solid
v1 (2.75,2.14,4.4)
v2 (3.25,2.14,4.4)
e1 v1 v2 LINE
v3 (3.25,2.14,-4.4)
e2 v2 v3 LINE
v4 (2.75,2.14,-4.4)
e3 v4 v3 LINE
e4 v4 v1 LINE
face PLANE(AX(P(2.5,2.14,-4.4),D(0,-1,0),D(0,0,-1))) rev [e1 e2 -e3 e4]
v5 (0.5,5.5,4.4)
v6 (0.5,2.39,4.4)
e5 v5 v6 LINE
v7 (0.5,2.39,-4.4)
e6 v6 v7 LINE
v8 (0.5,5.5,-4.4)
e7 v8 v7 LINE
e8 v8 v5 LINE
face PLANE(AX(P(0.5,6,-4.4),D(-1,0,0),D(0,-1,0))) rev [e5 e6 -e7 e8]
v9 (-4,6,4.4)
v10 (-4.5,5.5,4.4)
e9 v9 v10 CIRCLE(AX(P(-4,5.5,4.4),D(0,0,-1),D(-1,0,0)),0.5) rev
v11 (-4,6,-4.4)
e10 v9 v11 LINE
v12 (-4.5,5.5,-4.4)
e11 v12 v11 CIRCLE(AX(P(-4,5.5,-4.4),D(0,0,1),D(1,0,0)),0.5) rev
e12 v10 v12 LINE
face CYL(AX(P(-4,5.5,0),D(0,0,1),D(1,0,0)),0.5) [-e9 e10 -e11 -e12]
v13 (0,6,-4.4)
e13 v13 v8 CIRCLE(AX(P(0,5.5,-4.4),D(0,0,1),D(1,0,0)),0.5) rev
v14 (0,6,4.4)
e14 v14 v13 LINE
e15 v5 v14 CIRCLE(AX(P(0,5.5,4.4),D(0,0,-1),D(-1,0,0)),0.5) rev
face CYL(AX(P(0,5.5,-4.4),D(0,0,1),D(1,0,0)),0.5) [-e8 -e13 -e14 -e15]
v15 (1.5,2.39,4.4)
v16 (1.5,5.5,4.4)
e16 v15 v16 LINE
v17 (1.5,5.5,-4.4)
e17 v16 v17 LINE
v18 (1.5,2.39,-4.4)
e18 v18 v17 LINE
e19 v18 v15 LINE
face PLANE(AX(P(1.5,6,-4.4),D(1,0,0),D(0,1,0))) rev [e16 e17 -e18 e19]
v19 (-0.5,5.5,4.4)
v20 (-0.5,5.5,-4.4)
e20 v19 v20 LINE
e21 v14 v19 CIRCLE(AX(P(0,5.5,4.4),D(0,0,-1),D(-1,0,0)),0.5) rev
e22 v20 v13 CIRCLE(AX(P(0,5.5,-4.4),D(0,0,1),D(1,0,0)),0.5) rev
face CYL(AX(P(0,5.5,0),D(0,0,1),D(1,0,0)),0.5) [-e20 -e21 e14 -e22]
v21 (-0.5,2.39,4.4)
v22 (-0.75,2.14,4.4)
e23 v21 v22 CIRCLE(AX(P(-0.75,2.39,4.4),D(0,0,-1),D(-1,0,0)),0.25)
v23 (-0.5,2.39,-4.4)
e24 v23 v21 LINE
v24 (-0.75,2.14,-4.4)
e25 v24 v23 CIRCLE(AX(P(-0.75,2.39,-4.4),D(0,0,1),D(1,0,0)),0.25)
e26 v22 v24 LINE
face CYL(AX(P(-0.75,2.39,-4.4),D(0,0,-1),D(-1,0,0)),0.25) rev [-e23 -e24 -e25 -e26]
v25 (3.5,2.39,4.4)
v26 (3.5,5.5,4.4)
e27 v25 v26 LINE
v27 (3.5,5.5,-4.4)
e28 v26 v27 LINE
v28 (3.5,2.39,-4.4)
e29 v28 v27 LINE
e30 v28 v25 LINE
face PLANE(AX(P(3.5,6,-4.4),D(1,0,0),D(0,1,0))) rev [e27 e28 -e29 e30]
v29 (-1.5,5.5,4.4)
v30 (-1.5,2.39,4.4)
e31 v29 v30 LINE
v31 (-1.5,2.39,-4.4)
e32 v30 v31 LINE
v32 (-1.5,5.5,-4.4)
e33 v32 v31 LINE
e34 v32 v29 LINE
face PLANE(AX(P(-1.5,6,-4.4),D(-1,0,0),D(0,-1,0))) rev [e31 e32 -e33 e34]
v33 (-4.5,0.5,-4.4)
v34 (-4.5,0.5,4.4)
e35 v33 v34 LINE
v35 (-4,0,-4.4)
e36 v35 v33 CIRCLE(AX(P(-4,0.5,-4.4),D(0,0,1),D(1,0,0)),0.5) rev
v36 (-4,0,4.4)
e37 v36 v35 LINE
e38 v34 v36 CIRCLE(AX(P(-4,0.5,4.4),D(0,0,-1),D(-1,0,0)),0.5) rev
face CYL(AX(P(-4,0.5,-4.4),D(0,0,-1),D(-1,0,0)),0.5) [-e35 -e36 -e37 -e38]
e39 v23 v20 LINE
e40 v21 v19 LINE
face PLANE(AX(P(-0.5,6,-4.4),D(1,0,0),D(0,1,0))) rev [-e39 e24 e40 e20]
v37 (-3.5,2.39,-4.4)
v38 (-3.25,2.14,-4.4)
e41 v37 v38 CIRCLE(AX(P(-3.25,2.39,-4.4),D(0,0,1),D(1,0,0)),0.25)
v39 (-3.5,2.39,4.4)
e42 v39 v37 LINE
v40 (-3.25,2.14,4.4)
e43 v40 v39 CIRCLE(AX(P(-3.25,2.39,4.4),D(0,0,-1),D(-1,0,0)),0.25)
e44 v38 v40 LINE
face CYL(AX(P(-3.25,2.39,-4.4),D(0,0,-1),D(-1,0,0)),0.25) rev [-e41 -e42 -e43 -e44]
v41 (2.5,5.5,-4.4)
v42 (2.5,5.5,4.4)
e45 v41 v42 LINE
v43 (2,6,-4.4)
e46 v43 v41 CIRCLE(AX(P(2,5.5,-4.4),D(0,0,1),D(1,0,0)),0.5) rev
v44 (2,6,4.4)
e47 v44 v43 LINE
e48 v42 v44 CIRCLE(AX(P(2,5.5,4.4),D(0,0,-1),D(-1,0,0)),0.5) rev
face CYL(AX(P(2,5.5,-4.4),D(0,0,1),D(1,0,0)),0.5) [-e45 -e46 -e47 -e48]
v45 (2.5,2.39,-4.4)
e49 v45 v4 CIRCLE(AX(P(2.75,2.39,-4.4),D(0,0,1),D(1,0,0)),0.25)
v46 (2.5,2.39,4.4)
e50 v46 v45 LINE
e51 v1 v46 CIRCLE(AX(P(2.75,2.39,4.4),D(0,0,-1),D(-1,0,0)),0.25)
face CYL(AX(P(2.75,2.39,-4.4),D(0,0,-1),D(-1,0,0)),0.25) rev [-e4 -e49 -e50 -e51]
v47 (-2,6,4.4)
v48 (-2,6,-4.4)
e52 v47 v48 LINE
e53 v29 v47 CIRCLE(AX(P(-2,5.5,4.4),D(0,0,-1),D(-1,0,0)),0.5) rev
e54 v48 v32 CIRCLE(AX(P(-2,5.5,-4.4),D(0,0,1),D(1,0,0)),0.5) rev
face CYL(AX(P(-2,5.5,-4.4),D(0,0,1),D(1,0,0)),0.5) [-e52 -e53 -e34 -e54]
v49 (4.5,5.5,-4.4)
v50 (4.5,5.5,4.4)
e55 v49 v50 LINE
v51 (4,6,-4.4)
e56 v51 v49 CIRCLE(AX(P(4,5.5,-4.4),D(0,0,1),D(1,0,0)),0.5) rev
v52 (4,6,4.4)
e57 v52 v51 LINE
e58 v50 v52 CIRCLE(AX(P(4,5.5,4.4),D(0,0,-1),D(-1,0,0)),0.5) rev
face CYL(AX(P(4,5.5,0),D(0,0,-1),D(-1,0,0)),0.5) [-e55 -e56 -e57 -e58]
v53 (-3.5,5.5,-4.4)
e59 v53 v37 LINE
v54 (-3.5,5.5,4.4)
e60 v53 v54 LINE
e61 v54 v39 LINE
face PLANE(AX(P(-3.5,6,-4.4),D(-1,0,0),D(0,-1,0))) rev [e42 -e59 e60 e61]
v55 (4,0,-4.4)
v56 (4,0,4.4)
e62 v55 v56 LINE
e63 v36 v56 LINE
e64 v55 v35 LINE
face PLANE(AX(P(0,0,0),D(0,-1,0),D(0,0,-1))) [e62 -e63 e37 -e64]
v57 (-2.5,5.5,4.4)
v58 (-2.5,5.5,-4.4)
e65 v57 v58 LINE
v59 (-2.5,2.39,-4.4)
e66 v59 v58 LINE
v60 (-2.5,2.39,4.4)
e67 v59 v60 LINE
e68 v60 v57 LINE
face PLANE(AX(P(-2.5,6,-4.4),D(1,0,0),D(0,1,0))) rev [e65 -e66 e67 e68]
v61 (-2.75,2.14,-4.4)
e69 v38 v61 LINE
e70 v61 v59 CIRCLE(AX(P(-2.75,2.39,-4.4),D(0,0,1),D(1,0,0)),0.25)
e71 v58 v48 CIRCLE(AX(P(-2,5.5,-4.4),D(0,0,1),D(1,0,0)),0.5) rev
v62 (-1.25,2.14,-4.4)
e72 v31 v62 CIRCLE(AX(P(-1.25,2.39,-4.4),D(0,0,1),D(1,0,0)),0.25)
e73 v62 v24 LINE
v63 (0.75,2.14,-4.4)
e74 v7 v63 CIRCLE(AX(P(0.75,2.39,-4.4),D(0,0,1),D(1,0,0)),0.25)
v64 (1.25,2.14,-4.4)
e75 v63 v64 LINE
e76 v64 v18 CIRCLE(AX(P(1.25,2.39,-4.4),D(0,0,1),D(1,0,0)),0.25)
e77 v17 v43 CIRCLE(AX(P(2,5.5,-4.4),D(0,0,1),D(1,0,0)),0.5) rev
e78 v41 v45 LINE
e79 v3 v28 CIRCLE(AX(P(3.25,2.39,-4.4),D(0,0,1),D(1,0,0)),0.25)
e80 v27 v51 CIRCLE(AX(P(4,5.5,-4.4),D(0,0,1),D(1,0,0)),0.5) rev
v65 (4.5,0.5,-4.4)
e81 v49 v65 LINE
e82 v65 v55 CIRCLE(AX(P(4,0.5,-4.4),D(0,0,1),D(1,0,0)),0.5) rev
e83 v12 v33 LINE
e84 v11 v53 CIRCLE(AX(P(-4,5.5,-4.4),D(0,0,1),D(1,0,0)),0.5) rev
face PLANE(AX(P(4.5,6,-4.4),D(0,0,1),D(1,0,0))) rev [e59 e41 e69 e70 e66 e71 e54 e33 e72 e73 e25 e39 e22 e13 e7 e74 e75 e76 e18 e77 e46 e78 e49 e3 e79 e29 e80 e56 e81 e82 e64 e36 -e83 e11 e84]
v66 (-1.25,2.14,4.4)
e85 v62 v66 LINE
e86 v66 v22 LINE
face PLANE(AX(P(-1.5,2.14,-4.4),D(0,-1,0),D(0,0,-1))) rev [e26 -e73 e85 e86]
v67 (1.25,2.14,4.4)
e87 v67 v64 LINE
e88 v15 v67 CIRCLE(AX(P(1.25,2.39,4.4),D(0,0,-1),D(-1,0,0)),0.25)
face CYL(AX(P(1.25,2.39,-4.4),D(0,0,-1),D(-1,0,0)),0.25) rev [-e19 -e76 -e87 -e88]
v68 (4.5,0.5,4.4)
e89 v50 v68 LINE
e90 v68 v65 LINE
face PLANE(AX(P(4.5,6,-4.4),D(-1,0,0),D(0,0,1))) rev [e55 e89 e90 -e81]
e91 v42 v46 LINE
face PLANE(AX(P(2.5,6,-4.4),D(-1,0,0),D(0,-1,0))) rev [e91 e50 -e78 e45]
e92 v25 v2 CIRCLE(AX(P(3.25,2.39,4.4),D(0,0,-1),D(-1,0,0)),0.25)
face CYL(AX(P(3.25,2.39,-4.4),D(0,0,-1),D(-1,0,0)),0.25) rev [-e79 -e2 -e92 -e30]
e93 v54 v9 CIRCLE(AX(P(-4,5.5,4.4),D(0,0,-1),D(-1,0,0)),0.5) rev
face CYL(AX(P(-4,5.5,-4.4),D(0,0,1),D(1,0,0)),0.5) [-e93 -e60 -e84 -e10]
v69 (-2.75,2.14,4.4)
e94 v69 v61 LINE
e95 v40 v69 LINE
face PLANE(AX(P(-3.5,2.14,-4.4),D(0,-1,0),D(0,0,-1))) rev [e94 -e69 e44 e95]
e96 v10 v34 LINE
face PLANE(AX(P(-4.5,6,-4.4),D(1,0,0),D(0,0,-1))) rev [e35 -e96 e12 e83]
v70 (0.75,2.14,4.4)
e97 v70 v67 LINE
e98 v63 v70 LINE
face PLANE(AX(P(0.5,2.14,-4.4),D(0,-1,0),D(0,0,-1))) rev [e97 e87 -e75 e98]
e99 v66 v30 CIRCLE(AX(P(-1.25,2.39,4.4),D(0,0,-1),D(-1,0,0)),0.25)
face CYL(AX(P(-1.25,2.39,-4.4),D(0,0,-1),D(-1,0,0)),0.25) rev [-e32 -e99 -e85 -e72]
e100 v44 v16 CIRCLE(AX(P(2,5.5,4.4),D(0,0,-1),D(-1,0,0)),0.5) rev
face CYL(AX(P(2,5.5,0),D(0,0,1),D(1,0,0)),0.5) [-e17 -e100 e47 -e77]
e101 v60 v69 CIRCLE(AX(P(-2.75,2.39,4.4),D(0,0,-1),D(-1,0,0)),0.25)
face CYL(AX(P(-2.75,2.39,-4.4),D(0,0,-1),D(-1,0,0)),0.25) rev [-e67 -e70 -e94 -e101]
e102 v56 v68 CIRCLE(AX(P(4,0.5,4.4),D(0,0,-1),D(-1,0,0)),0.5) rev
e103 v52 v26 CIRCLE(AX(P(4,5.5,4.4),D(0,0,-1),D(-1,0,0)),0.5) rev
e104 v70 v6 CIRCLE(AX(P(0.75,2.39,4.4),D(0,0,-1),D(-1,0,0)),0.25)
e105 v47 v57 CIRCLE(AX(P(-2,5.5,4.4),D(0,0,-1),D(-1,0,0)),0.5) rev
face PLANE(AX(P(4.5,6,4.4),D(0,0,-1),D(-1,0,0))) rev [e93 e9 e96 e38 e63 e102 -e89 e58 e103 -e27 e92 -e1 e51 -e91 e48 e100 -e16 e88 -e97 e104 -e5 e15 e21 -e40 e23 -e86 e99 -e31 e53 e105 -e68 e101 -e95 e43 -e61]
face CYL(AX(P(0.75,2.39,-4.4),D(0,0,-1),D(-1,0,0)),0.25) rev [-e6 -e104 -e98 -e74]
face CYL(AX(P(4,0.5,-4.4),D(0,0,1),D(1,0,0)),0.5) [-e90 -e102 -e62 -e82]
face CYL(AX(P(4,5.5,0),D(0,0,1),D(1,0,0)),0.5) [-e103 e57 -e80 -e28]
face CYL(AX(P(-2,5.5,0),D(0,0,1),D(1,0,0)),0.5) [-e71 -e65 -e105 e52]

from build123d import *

# Parameters (mm, degrees)
SKETCH1_W           = 9
SKETCH1_H           = 8.8
BOSS_EXTRUDE1_DEPTH = 6
SKETCH2_W           = 1
SKETCH2_H           = 3.86
CUT_EXTRUDE1_DEPTH  = 12.562439189
LPATTERN1_COUNT     = 4
LPATTERN1_PITCH     = 2
FILLET1_R           = 0.25
FILLET2_R           = 0.5


with BuildPart() as part:
    # Sketch1 → Boss-Extrude1 (new body)
    with BuildSketch(Plane(origin=(0, 0, 0), x_dir=(1, 0, 0), z_dir=(0, 1, 0))):
        Rectangle(SKETCH1_W, SKETCH1_H)
    extrude(amount=BOSS_EXTRUDE1_DEPTH)

    # Sketch2 → Cut-Extrude1 (cut, through all)
    with BuildSketch(Plane.XY.offset(4.4)):
        with Locations((-3, 4.07)):
            Rectangle(SKETCH2_W, SKETCH2_H)
    cut_extrude1 = extrude(amount=-CUT_EXTRUDE1_DEPTH, mode=Mode.SUBTRACT)

    # LPattern1: Cut-Extrude1 ×4
    with Locations(*[(i * LPATTERN1_PITCH, 0, 0) for i in range(1, LPATTERN1_COUNT)]):
        add(cut_extrude1, mode=Mode.SUBTRACT)

    # Fillet1
    fillet1_edges = [part.edges().sort_by_distance(p)[0] for p in [
        (-2.5, 2.14, 0),
        (-3.5, 2.14, 0),
        (-0.5, 2.14, 0),
        (-1.5, 2.14, 0),
        (1.5, 2.14, 0),
        (0.5, 2.14, 0),
        (3.5, 2.14, 0),
        (2.5, 2.14, 0),
    ]]
    fillet(fillet1_edges, radius=FILLET1_R)

    # Fillet2
    fillet2_edges = [part.edges().sort_by_distance(p)[0] for p in [
        (-4.5, 6, 0),
        (-3.5, 6, 0),
        (-2.5, 6, 0),
        (-1.5, 6, 0),
        (-0.5, 6, 0),
        (0.5, 6, 0),
        (1.5, 6, 0),
        (2.5, 6, 0),
        (3.5, 6, 0),
        (4.5, 6, 0),
        (-4.5, 0, 0),
        (4.5, 0, 0),
    ]]
    fillet(fillet2_edges, radius=FILLET2_R - 0.0001)  # a hair under: the kernel refuses the full size


solid = part.part
